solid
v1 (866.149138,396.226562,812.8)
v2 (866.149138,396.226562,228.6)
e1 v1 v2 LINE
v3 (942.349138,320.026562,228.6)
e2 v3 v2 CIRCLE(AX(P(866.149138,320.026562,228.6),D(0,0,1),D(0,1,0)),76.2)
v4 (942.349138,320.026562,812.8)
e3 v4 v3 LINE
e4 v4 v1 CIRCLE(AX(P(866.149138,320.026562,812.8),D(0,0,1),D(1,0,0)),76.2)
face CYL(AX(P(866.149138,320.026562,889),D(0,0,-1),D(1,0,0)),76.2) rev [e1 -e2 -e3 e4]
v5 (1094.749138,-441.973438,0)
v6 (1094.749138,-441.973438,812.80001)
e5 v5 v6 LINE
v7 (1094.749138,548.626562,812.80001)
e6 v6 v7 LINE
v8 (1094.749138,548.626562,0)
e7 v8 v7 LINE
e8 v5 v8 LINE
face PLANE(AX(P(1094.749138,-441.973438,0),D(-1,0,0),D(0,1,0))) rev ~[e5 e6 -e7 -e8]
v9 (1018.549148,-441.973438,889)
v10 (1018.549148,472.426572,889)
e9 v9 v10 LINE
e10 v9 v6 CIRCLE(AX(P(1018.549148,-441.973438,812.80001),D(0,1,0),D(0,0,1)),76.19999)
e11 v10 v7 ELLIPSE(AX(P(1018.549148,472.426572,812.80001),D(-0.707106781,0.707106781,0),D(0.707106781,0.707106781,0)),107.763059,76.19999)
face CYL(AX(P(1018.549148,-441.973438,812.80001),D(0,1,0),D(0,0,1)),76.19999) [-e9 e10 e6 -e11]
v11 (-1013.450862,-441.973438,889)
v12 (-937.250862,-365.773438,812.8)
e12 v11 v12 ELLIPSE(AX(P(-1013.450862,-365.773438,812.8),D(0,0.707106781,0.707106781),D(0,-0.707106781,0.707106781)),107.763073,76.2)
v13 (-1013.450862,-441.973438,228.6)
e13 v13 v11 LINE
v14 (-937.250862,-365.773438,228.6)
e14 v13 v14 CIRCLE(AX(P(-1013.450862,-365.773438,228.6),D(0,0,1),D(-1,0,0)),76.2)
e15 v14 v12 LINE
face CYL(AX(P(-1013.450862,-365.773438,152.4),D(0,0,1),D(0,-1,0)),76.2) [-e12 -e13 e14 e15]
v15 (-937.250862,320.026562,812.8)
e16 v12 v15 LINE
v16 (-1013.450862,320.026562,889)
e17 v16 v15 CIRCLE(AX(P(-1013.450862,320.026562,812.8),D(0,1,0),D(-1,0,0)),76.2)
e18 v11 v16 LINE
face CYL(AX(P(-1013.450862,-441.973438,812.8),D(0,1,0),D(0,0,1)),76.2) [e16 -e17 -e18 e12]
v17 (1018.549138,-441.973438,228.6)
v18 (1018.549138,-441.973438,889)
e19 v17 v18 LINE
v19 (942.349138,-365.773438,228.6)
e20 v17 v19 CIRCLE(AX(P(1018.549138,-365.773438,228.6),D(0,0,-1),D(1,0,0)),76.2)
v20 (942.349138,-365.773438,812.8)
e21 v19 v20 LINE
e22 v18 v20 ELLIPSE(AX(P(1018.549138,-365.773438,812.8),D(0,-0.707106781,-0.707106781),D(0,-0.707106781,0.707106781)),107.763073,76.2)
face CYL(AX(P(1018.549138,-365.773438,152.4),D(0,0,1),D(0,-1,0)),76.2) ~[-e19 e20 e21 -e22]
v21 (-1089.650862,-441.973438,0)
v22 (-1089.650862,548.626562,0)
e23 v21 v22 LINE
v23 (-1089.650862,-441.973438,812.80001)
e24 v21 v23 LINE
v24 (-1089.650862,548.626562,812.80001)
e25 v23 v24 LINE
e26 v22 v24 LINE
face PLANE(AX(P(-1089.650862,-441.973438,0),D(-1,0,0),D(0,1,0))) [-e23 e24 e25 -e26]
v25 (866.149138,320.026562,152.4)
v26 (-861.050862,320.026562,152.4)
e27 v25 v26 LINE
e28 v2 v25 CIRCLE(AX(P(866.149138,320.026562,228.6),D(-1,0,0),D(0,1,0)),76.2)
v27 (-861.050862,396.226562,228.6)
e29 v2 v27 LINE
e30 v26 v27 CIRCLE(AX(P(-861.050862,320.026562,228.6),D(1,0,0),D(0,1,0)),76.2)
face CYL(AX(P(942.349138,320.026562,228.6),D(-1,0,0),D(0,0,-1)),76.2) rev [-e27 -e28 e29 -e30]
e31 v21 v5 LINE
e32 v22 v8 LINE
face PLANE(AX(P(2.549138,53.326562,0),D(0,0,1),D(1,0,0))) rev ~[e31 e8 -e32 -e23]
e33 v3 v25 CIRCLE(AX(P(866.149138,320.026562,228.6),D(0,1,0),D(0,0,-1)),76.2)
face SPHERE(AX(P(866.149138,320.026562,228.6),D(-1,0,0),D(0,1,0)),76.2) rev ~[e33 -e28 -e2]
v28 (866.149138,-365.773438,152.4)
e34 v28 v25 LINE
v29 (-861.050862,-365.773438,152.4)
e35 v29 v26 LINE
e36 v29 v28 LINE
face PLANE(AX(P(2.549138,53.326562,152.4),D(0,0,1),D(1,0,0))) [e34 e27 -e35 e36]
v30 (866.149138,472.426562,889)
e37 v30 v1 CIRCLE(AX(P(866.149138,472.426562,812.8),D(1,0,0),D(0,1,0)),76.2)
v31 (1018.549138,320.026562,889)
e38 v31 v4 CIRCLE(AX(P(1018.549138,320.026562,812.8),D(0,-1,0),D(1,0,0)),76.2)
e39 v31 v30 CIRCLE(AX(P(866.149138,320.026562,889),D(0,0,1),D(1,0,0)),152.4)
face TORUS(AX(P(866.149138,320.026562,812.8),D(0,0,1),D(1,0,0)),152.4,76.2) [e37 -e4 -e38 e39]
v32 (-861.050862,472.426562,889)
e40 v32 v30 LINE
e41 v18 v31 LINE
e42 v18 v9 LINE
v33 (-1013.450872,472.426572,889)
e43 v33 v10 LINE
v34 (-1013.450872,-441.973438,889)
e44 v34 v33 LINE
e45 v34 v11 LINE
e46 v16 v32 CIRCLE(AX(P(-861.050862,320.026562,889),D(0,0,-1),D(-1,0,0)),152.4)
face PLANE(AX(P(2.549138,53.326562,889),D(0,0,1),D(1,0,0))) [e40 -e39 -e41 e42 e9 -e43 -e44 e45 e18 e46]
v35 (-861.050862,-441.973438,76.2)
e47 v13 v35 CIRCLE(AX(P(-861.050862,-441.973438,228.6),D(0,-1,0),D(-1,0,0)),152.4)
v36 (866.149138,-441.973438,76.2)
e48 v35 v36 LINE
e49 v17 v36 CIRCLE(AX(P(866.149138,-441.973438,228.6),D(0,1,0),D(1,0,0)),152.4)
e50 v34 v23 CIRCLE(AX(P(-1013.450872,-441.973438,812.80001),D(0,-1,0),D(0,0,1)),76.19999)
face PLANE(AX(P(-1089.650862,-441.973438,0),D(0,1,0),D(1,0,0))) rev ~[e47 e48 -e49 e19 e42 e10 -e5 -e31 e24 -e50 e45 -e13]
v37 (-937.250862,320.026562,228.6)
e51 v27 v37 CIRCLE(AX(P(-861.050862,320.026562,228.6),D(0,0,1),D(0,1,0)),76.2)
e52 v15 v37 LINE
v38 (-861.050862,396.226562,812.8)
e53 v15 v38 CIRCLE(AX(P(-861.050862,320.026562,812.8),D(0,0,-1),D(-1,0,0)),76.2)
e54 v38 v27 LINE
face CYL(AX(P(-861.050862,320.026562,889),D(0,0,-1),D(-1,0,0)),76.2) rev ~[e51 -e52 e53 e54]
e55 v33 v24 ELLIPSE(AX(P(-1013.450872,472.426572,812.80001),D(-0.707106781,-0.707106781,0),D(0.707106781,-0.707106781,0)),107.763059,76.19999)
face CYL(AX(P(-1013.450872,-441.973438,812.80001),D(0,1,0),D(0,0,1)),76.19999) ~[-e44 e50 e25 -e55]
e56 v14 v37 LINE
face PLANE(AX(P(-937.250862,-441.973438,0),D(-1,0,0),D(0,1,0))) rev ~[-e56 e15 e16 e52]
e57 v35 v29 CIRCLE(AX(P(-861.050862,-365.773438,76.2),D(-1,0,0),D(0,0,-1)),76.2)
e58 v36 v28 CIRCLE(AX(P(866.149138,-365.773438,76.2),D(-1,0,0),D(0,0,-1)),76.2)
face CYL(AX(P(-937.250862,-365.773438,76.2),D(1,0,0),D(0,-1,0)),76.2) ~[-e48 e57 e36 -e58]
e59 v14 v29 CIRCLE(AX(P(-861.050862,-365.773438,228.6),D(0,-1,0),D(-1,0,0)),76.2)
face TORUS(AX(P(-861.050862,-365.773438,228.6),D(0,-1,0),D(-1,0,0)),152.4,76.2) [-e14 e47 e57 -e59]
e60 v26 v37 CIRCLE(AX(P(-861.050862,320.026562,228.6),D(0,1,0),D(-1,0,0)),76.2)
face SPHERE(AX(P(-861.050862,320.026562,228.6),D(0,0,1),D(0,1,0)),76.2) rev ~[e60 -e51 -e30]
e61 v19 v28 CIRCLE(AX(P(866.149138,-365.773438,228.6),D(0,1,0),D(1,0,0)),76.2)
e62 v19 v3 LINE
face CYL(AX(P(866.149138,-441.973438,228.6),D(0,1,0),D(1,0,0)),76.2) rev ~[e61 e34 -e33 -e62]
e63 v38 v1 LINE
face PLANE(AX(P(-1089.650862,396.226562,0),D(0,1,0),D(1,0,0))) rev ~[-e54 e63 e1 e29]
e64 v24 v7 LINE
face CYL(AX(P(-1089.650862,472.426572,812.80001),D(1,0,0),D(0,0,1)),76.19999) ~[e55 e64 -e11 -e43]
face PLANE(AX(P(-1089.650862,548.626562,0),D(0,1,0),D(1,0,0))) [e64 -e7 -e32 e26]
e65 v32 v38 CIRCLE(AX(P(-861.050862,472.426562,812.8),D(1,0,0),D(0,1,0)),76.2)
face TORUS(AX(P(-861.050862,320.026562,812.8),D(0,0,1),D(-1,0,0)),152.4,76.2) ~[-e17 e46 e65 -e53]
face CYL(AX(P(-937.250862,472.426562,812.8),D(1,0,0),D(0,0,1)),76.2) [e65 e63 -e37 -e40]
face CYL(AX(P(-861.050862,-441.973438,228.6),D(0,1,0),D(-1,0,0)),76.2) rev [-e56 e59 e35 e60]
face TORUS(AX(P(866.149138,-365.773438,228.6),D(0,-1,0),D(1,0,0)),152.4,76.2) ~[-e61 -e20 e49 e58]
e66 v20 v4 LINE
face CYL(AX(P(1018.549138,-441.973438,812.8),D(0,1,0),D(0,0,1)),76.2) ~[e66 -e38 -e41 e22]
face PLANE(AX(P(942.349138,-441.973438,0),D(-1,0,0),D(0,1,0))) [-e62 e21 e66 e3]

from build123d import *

# Parameters (mm, degrees)
F0_W     = 2184.4
F0_H     = 990.6
F1_DEPTH = 889
F2_T     = -152.4
F3_R     = 76.2
F4_R     = 76.19999


# Not quite as in the source:
# - a fillet or chamfer is up to 0.001 mm smaller than in the source, because OpenCascade refuses the exact size


with BuildPart() as f1:
    # F0 (on Top) → F1 (new body)
    with BuildSketch(Plane.XY):
        with Locations((2.5491379201, 53.3265618357)):
            Rectangle(F0_W, F0_H)
    extrude(amount=F1_DEPTH)

    # F2
    f2_openings = [f1.faces().sort_by_distance(p)[0] for p in [
        (2.549138, 53.326562, 889),
        (2.549138, -441.973438, 444.5),
    ]]
    offset(amount=F2_T, openings=f2_openings)

    # F3
    f3_edges = [f1.edges().sort_by_distance(p)[0] for p in [
        (2.549138, 396.226562, 889),
        (-937.250862, 396.226562, 520.7),
        (2.549138, 396.226562, 152.4),
        (942.349138, 396.226562, 520.7),
        (2.549138, -441.973438, 152.4),
        (942.349138, -22.873438, 152.4),
        (-937.250862, -22.873438, 152.4),
        (-937.250862, -441.973438, 520.7),
        (-937.250862, -22.873438, 889),
        (942.349138, -441.973438, 520.7),
        (942.349138, -22.873438, 889),
    ]]
    fillet(f3_edges, radius=F3_R)

    # F4 (radius 76.2 in the source; OpenCascade refuses exactly that, so slightly less here)
    f4_edges = [f1.edges().sort_by_distance(p)[0] for p in [
        (1094.749138, 53.326562, 889),
        (2.549138, 548.626562, 889),
        (-1089.650862, 53.326562, 889),
    ]]
    fillet(f4_edges, radius=F4_R)


solid = f1.part
